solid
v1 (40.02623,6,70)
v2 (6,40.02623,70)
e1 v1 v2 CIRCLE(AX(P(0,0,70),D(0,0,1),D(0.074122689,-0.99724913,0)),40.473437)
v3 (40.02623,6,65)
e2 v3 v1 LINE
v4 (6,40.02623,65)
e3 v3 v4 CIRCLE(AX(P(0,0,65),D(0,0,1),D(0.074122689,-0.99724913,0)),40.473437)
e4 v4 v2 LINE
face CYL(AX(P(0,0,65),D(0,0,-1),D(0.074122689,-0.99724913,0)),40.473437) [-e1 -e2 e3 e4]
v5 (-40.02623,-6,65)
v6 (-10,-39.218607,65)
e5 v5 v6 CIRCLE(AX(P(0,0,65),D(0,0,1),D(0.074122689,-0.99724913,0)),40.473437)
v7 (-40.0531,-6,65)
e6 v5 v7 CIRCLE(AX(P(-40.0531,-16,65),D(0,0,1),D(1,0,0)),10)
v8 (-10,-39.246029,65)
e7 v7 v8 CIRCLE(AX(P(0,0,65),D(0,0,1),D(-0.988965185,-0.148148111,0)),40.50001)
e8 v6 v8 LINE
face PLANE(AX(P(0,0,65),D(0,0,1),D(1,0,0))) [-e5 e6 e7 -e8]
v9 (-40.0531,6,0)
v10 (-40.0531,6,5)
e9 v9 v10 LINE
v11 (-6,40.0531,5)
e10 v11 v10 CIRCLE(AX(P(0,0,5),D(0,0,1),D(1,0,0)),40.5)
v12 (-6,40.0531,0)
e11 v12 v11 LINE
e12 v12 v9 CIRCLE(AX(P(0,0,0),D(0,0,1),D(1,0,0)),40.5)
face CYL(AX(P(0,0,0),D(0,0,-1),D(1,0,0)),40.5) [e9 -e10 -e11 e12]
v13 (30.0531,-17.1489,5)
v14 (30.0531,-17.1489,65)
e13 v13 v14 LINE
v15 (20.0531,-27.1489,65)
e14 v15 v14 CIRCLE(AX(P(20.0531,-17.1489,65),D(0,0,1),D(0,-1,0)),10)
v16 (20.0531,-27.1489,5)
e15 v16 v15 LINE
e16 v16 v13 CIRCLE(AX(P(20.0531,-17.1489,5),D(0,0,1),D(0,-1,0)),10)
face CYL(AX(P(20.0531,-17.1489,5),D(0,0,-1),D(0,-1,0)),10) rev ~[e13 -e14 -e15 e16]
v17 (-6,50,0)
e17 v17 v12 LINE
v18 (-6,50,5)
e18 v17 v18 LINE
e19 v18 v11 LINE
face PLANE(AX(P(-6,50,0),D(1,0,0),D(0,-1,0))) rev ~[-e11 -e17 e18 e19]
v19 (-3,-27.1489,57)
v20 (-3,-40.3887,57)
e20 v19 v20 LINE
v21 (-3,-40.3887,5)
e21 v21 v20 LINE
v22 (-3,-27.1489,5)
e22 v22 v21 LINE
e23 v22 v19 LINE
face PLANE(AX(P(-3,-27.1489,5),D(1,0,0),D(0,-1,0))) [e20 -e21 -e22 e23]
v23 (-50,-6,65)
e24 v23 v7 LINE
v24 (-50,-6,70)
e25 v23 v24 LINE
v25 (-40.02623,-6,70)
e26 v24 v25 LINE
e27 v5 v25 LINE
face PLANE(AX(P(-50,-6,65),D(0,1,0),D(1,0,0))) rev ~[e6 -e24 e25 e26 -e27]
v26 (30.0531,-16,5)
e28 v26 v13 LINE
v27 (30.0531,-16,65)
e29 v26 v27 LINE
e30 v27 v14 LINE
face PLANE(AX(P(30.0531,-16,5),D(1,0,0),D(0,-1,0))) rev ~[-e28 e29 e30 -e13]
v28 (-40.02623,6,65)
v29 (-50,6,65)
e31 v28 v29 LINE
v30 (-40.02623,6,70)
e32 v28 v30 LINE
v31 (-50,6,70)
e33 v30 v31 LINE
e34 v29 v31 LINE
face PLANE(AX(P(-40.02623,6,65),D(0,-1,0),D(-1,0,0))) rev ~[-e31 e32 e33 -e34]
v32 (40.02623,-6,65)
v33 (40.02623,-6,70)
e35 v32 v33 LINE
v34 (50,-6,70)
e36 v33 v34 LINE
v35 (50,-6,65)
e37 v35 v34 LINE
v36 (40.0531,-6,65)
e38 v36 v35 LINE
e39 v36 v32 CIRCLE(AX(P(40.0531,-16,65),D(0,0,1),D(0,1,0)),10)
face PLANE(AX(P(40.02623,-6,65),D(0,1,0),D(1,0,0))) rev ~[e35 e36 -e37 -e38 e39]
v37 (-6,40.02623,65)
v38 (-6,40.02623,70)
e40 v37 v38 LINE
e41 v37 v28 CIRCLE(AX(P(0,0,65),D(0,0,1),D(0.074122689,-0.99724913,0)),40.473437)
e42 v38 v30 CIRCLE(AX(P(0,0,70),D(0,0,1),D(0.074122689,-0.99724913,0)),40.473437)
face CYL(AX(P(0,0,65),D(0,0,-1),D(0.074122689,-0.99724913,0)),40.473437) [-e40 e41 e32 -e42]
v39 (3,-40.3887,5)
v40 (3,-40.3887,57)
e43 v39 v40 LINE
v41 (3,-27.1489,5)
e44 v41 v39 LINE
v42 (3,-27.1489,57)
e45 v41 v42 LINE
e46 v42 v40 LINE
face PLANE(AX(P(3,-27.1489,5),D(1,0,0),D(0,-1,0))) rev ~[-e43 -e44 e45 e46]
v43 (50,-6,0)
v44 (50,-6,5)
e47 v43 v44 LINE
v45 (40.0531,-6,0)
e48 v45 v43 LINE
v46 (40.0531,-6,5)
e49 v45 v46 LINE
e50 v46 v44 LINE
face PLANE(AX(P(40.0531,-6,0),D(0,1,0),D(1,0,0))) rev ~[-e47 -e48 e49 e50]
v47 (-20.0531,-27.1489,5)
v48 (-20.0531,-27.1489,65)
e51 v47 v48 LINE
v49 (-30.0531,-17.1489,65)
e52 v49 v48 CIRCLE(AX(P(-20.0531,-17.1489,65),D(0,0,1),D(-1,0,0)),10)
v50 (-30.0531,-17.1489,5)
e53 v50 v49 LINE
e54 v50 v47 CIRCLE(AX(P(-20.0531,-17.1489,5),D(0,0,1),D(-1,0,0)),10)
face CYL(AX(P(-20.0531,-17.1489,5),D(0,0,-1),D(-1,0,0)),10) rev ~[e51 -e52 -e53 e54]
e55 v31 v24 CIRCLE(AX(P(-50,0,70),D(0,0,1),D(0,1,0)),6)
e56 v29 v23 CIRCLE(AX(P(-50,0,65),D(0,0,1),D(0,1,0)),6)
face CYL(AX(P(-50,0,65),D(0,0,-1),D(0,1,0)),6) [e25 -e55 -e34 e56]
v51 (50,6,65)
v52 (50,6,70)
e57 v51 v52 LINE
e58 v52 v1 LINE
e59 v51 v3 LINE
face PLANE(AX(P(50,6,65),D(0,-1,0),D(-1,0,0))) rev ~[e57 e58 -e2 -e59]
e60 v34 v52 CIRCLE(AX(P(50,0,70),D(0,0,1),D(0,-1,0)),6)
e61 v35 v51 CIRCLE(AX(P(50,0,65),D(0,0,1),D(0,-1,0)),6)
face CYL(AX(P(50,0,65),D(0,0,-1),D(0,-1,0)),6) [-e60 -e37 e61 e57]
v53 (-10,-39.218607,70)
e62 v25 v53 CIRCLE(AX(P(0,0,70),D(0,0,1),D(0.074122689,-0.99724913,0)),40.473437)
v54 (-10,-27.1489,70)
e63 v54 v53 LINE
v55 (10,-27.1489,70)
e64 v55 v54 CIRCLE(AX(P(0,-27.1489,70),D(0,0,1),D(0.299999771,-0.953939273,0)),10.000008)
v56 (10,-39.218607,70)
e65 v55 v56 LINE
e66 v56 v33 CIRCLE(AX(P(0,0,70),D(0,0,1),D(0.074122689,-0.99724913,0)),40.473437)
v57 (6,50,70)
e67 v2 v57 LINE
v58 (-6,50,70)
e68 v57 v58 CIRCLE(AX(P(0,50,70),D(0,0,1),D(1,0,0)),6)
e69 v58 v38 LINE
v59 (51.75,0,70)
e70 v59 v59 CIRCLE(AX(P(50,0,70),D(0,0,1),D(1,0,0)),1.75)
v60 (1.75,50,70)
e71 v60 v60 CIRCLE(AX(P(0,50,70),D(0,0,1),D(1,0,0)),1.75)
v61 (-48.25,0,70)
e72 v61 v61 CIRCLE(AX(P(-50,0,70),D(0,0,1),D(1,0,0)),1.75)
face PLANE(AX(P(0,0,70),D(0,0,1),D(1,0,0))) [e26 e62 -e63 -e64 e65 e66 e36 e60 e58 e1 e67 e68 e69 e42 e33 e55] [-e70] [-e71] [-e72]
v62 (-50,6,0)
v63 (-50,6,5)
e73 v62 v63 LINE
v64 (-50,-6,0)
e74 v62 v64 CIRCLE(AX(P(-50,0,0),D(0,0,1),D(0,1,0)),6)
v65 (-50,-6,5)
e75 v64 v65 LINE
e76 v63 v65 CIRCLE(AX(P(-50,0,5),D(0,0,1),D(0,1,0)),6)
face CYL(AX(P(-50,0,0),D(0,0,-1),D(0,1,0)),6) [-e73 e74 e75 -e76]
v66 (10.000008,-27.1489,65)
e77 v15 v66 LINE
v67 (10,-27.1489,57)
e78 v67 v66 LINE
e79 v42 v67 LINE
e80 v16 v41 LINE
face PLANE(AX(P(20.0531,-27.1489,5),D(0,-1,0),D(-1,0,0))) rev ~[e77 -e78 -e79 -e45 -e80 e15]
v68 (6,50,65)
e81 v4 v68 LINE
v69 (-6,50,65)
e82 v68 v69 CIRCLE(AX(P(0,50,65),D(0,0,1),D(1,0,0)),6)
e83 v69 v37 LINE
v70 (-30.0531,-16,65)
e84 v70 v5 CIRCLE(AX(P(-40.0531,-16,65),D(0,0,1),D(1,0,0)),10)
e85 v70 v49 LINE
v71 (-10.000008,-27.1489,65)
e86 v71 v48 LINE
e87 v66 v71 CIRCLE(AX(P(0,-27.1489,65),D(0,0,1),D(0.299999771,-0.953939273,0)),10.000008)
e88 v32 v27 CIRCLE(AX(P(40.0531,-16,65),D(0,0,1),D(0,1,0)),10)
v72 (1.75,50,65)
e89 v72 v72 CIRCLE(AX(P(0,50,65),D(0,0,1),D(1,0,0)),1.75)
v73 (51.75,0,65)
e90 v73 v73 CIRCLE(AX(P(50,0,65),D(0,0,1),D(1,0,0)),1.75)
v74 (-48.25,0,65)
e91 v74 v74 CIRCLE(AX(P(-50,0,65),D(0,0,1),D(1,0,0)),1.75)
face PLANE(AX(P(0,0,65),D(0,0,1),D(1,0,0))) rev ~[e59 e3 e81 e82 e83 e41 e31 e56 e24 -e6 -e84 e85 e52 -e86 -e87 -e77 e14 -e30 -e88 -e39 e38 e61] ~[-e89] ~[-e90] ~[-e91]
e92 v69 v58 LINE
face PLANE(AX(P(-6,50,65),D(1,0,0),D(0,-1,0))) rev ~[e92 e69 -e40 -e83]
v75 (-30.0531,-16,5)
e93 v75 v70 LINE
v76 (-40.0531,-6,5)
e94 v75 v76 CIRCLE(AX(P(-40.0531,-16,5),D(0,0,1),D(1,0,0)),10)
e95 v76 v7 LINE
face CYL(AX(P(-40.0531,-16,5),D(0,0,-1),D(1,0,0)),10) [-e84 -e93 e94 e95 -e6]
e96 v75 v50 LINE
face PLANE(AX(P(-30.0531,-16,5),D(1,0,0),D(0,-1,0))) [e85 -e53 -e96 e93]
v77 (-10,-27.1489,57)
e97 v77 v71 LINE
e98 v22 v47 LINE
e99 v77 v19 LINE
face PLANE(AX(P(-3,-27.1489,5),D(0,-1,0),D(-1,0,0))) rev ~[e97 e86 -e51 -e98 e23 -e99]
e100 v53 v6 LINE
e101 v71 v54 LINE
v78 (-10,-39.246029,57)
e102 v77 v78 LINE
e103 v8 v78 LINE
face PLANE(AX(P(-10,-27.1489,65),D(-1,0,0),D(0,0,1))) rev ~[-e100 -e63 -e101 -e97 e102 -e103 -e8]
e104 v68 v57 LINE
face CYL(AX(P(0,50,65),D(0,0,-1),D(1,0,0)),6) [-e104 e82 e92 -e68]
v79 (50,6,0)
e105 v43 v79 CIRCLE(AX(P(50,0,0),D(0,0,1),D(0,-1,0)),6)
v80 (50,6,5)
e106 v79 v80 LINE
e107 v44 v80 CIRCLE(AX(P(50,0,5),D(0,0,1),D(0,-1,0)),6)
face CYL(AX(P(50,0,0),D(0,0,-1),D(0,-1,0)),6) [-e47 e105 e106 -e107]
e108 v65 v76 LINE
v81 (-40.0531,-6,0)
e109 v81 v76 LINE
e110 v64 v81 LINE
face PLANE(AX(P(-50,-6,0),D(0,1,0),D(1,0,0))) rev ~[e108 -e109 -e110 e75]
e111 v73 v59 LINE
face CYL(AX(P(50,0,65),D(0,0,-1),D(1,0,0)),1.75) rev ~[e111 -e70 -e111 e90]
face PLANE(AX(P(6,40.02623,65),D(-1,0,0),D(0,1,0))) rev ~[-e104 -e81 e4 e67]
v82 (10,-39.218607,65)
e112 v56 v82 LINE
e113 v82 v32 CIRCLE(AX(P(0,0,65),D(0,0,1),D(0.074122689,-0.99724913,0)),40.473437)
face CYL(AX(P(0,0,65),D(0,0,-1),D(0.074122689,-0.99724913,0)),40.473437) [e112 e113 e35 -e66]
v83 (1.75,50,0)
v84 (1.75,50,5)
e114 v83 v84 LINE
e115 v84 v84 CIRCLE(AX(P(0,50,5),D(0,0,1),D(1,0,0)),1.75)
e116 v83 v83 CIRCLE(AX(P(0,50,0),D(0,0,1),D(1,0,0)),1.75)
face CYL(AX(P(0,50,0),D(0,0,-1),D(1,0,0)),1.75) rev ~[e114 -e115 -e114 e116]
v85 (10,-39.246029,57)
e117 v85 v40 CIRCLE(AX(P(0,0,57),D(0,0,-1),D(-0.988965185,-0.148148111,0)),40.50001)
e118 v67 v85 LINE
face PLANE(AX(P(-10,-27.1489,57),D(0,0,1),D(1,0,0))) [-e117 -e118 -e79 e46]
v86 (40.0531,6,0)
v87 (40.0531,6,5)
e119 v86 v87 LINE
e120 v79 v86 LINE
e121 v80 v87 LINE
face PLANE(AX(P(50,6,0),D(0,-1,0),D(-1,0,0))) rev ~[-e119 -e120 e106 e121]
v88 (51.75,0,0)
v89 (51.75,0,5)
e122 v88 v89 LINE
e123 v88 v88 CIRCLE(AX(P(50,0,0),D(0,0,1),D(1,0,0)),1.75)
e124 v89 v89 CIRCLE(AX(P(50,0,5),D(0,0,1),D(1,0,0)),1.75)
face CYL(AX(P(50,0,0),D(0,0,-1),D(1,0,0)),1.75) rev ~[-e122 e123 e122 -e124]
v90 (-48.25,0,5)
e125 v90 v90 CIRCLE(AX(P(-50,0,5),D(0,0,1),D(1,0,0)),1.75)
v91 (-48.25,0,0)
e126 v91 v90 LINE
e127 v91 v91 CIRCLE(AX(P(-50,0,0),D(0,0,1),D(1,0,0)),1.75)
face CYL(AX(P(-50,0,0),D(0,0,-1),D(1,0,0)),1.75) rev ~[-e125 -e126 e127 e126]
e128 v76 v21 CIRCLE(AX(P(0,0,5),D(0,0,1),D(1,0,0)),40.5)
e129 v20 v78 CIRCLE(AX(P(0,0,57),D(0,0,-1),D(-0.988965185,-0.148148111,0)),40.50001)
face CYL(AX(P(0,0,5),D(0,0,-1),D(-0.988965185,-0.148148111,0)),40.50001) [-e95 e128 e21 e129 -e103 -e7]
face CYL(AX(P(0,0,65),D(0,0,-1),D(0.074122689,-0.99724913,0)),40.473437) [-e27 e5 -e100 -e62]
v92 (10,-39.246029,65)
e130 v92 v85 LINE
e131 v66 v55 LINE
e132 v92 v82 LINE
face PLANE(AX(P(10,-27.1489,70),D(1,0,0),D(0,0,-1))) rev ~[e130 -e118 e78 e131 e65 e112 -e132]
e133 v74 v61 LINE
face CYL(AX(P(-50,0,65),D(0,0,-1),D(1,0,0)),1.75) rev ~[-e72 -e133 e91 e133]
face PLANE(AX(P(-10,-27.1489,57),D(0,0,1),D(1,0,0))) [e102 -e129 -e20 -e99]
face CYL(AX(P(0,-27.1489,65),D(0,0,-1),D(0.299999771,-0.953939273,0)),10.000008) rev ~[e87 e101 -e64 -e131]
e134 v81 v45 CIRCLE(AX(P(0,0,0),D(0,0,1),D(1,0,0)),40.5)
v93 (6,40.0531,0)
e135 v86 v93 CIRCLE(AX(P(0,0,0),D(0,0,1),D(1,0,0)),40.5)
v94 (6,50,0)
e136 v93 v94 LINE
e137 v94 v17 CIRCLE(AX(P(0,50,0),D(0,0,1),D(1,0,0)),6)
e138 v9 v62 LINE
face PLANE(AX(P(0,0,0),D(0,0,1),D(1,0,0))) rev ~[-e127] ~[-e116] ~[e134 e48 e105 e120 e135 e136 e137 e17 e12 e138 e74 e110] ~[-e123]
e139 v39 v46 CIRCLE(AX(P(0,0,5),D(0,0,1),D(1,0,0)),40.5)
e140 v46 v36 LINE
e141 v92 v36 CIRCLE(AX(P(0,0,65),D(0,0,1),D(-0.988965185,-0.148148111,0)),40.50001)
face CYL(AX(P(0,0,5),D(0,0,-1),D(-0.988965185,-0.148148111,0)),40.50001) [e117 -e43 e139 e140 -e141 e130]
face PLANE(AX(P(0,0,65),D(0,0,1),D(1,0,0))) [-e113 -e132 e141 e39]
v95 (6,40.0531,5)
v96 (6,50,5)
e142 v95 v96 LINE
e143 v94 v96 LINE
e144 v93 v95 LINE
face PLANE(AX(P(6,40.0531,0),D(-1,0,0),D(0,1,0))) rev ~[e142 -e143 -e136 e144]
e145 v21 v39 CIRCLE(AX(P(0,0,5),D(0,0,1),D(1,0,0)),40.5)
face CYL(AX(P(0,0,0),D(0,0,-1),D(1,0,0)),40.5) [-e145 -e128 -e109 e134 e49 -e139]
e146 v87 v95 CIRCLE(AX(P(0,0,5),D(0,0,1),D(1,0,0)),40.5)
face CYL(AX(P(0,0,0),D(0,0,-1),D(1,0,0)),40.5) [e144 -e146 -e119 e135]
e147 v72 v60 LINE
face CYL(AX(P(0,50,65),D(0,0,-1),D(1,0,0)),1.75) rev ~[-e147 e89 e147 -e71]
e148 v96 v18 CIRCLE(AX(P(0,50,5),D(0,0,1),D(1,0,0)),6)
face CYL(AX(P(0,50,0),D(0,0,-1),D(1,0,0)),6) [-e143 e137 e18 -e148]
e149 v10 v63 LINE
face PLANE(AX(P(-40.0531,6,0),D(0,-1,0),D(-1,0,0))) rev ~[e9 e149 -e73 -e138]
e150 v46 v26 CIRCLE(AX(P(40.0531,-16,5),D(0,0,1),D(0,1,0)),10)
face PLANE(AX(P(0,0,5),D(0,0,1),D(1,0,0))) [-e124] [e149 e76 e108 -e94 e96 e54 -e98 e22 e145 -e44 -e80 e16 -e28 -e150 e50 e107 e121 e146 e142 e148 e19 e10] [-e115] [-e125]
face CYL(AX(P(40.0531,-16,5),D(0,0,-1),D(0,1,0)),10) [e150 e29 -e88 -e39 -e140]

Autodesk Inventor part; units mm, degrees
ref_plane "YZ Plane" through (0, 0, 0) normal (1, 0, 0) x (0, 1, 0)
ref_plane "XZ Plane" through (0, 0, 0) normal (0, 1, 0) x (-1, 0, 0)
ref_plane "XY Plane" through (0, 0, 0) normal (0, 0, 1) x (1, 0, 0)
sketch "Sketch1" plane through (0, 0, 0) normal (0, 0, 1) x (1, 0, 0)
  circle A0 centre (0, 0) radius 40.5
  line L0 (0, 0) -> (0, 50) construction
  arc A1 (6, 50) -> (-6, 50) centre (0, 50) ccw
  line L1 (0, 0) -> (50, 0) construction
  arc A2 (50, -6) -> (50, 6) centre (50, 0) ccw
  line L2 (0, 0) -> (-50, 0) construction
  arc A3 (-50, 6) -> (-50, -6) centre (-50, 0) ccw
  line L3 (-6, 50) -> (-6, 40.0531)
  line L4 (6, 40.0531) -> (6, 50)
  line L5 (-40.0531, 6) -> (-50, 6)
  line L6 (-50, -6) -> (-40.0531, -6)
  line L7 (50, 6) -> (40.0531, 6)
  line L8 (40.0531, -6) -> (50, -6)
  circle A4 centre (-50, 0) radius 1.75
  circle A5 centre (0, 50) radius 1.75
  circle A6 centre (50, 0) radius 1.75
  point P0 (0, 25)
  point P1 (25, 0)
  point P2 (-25, 0)
  dimension "d0" = 81
  dimension "d3" = 50
  dimension "d4" = 12
  dimension "d5" = 50
  dimension "d6" = 12
  dimension "d7" = 50
  dimension "d8" = 12
  dimension "d9" = 3.5
  dimension "d10" = 3.5
  dimension "d11" = 3.5
extrude "Extrusion2" add sketch "Sketch1" along normal blind 5
sketch "Sketch2" plane through (0, 0, 5) normal (0, 0, 1) x (1, 0, 0)
  arc A0 (-40.0531, -6) -> (40.0531, -6) centre (0, 0) ccw projected
  line L0 (-40.0531, -6) -> (-40.0531, -6)
  line L1 (-40.0531, -6) -> (-40.0531, -6) construction
  line L2 (-30.0531, -16) -> (-30.0531, -17.1489)
  line L3 (40.0531, -6) -> (40.0531, -6)
  line L4 (30.0531, -16) -> (30.0531, -17.1489)
  arc A1 (-30.0531, -17.1489) -> (-20.0531, -27.1489) centre (-20.0531, -17.1489) ccw
  arc A2 (20.0531, -27.1489) -> (30.0531, -17.1489) centre (20.0531, -17.1489) ccw
  arc A3 (40.0531, -6) -> (30.0531, -16) centre (40.0531, -16) ccw
  arc A4 (-30.0531, -16) -> (-40.0531, -6) centre (-40.0531, -16) ccw
  line L5 (-3, -27.1489) -> (-3, -40.3887)
  line L6 (3, -27.1489) -> (3, -40.3887)
  line L7 (20.0531, -27.1489) -> (3, -27.1489)
  line L8 (-3, -27.1489) -> (-20.0531, -27.1489)
  point P0 (-30.0531, -6)
  point P1 (-30.0531, -27.1489)
  point P2 (30.0531, -6)
  point P3 (30.0531, -27.1489)
  dimension "d16" = 10
  dimension "d17" = 0
  dimension "d18" = 90
  dimension "d19" = 10
  dimension "d20" = 10
extrude "Extrusion3" add sketch "Sketch2" along normal blind 60
sketch "Sketch3" plane through (0, 0, 65) normal (0, 0, 1) x (1, 0, 0)
  arc A0 (3, -40.3621) -> (-3, -40.3621) centre (0, 0) ccw
  arc A1 (6, 50) -> (-6, 50) centre (0, 50) ccw projected
  line L0 (0, 0) -> (0, 50) construction
  line L1 (6, 0) -> (6, 50)
  line L2 (-6, 50) -> (-6, 0)
  arc A2 (-6, 0) -> (6, 0) centre (0, 0) ccw
  arc A3 (6, 50) -> (-6, 50) centre (0, 50) ccw
  line L3 (0, 0) -> (50, 0) construction
  line L4 (0, 0) -> (50, 0) construction
  line L5 (0, -6) -> (50, -6)
  line L6 (50, 6) -> (0, 6)
  arc A4 (0, 6) -> (0, -6) centre (0, 0) ccw
  arc A5 (50, -6) -> (50, 6) centre (50, 0) ccw
  line L7 (0, 0) -> (-50, 0) construction
  line L8 (0, 6) -> (-50, 6)
  line L9 (-50, -6) -> (0, -6)
  arc A6 (0, -6) -> (0, 6) centre (0, 0) ccw
  arc A7 (-50, 6) -> (-50, -6) centre (-50, 0) ccw
  circle A8 centre (50, 0) radius 1.75
  circle A9 centre (-50, 0) radius 1.75
  circle A10 centre (0, 50) radius 1.75
  line L10 (-3, -40.3887) -> (-3, -36.6883)
  line L11 (3, -36.6883) -> (3, -40.3887)
  arc A11 (3, -36.6883) -> (-3, -36.6883) centre (0, -27.1489) ccw
  point P0 (0, 25)
  point P1 (25, 0)
  point P2 (-25, 0)
  dimension "d26" = 50
  dimension "d27" = 90
  dimension "d28" = 12
  dimension "d29" = 50
  dimension "d30" = 12
  dimension "d31" = 50
  dimension "d32" = 12
  dimension "d33" = 3.5
  dimension "d34" = 3.5
  dimension "d35" = 3.5
  dimension "d45" = 20
extrude "Extrusion4" add sketch "Sketch3" along normal blind 5
sketch "Sketch4" plane through (3, -27.1489, 5) normal (0, 1, 0) x (1, 0, 0)
  line L0 (7, -60) -> (0, -60) projected
  line L1 (-6, -60) -> (-13, -60) projected
  line L2 (0, -70) -> (5, -70) projected
  line L3 (5, -70) -> (13, -70) construction
  line L4 (-6, -60) -> (-43.0263, -60) projected
  line L5 (-11, -70) -> (-3, -70) construction
  line L6 (7, -60) -> (-13, -60)
  line L7 (-13, -60) -> (-13, -52)
  line L8 (-13, -52) -> (7, -52)
  line L9 (7, -52) -> (7, -60)
  line L10 (7, -60) -> (-13, -60)
  line L11 (-13, -60) -> (-13, -65)
  line L12 (-13, -65) -> (7, -65)
  line L13 (7, -65) -> (7, -60)
  point P0 (-3, 5)
  point P1 (0, -60)
  dimension "d46" = 8
  dimension "d47" = 20
  dimension "d48" = 5
extrude "Extrusion5" cut sketch "Sketch4" against normal blind 15
ref_plane "Work Plane1" through (0, 0, 65) normal (-1, 0, 0) x (0, 1, 0)
properties part number "Astra_slot"
